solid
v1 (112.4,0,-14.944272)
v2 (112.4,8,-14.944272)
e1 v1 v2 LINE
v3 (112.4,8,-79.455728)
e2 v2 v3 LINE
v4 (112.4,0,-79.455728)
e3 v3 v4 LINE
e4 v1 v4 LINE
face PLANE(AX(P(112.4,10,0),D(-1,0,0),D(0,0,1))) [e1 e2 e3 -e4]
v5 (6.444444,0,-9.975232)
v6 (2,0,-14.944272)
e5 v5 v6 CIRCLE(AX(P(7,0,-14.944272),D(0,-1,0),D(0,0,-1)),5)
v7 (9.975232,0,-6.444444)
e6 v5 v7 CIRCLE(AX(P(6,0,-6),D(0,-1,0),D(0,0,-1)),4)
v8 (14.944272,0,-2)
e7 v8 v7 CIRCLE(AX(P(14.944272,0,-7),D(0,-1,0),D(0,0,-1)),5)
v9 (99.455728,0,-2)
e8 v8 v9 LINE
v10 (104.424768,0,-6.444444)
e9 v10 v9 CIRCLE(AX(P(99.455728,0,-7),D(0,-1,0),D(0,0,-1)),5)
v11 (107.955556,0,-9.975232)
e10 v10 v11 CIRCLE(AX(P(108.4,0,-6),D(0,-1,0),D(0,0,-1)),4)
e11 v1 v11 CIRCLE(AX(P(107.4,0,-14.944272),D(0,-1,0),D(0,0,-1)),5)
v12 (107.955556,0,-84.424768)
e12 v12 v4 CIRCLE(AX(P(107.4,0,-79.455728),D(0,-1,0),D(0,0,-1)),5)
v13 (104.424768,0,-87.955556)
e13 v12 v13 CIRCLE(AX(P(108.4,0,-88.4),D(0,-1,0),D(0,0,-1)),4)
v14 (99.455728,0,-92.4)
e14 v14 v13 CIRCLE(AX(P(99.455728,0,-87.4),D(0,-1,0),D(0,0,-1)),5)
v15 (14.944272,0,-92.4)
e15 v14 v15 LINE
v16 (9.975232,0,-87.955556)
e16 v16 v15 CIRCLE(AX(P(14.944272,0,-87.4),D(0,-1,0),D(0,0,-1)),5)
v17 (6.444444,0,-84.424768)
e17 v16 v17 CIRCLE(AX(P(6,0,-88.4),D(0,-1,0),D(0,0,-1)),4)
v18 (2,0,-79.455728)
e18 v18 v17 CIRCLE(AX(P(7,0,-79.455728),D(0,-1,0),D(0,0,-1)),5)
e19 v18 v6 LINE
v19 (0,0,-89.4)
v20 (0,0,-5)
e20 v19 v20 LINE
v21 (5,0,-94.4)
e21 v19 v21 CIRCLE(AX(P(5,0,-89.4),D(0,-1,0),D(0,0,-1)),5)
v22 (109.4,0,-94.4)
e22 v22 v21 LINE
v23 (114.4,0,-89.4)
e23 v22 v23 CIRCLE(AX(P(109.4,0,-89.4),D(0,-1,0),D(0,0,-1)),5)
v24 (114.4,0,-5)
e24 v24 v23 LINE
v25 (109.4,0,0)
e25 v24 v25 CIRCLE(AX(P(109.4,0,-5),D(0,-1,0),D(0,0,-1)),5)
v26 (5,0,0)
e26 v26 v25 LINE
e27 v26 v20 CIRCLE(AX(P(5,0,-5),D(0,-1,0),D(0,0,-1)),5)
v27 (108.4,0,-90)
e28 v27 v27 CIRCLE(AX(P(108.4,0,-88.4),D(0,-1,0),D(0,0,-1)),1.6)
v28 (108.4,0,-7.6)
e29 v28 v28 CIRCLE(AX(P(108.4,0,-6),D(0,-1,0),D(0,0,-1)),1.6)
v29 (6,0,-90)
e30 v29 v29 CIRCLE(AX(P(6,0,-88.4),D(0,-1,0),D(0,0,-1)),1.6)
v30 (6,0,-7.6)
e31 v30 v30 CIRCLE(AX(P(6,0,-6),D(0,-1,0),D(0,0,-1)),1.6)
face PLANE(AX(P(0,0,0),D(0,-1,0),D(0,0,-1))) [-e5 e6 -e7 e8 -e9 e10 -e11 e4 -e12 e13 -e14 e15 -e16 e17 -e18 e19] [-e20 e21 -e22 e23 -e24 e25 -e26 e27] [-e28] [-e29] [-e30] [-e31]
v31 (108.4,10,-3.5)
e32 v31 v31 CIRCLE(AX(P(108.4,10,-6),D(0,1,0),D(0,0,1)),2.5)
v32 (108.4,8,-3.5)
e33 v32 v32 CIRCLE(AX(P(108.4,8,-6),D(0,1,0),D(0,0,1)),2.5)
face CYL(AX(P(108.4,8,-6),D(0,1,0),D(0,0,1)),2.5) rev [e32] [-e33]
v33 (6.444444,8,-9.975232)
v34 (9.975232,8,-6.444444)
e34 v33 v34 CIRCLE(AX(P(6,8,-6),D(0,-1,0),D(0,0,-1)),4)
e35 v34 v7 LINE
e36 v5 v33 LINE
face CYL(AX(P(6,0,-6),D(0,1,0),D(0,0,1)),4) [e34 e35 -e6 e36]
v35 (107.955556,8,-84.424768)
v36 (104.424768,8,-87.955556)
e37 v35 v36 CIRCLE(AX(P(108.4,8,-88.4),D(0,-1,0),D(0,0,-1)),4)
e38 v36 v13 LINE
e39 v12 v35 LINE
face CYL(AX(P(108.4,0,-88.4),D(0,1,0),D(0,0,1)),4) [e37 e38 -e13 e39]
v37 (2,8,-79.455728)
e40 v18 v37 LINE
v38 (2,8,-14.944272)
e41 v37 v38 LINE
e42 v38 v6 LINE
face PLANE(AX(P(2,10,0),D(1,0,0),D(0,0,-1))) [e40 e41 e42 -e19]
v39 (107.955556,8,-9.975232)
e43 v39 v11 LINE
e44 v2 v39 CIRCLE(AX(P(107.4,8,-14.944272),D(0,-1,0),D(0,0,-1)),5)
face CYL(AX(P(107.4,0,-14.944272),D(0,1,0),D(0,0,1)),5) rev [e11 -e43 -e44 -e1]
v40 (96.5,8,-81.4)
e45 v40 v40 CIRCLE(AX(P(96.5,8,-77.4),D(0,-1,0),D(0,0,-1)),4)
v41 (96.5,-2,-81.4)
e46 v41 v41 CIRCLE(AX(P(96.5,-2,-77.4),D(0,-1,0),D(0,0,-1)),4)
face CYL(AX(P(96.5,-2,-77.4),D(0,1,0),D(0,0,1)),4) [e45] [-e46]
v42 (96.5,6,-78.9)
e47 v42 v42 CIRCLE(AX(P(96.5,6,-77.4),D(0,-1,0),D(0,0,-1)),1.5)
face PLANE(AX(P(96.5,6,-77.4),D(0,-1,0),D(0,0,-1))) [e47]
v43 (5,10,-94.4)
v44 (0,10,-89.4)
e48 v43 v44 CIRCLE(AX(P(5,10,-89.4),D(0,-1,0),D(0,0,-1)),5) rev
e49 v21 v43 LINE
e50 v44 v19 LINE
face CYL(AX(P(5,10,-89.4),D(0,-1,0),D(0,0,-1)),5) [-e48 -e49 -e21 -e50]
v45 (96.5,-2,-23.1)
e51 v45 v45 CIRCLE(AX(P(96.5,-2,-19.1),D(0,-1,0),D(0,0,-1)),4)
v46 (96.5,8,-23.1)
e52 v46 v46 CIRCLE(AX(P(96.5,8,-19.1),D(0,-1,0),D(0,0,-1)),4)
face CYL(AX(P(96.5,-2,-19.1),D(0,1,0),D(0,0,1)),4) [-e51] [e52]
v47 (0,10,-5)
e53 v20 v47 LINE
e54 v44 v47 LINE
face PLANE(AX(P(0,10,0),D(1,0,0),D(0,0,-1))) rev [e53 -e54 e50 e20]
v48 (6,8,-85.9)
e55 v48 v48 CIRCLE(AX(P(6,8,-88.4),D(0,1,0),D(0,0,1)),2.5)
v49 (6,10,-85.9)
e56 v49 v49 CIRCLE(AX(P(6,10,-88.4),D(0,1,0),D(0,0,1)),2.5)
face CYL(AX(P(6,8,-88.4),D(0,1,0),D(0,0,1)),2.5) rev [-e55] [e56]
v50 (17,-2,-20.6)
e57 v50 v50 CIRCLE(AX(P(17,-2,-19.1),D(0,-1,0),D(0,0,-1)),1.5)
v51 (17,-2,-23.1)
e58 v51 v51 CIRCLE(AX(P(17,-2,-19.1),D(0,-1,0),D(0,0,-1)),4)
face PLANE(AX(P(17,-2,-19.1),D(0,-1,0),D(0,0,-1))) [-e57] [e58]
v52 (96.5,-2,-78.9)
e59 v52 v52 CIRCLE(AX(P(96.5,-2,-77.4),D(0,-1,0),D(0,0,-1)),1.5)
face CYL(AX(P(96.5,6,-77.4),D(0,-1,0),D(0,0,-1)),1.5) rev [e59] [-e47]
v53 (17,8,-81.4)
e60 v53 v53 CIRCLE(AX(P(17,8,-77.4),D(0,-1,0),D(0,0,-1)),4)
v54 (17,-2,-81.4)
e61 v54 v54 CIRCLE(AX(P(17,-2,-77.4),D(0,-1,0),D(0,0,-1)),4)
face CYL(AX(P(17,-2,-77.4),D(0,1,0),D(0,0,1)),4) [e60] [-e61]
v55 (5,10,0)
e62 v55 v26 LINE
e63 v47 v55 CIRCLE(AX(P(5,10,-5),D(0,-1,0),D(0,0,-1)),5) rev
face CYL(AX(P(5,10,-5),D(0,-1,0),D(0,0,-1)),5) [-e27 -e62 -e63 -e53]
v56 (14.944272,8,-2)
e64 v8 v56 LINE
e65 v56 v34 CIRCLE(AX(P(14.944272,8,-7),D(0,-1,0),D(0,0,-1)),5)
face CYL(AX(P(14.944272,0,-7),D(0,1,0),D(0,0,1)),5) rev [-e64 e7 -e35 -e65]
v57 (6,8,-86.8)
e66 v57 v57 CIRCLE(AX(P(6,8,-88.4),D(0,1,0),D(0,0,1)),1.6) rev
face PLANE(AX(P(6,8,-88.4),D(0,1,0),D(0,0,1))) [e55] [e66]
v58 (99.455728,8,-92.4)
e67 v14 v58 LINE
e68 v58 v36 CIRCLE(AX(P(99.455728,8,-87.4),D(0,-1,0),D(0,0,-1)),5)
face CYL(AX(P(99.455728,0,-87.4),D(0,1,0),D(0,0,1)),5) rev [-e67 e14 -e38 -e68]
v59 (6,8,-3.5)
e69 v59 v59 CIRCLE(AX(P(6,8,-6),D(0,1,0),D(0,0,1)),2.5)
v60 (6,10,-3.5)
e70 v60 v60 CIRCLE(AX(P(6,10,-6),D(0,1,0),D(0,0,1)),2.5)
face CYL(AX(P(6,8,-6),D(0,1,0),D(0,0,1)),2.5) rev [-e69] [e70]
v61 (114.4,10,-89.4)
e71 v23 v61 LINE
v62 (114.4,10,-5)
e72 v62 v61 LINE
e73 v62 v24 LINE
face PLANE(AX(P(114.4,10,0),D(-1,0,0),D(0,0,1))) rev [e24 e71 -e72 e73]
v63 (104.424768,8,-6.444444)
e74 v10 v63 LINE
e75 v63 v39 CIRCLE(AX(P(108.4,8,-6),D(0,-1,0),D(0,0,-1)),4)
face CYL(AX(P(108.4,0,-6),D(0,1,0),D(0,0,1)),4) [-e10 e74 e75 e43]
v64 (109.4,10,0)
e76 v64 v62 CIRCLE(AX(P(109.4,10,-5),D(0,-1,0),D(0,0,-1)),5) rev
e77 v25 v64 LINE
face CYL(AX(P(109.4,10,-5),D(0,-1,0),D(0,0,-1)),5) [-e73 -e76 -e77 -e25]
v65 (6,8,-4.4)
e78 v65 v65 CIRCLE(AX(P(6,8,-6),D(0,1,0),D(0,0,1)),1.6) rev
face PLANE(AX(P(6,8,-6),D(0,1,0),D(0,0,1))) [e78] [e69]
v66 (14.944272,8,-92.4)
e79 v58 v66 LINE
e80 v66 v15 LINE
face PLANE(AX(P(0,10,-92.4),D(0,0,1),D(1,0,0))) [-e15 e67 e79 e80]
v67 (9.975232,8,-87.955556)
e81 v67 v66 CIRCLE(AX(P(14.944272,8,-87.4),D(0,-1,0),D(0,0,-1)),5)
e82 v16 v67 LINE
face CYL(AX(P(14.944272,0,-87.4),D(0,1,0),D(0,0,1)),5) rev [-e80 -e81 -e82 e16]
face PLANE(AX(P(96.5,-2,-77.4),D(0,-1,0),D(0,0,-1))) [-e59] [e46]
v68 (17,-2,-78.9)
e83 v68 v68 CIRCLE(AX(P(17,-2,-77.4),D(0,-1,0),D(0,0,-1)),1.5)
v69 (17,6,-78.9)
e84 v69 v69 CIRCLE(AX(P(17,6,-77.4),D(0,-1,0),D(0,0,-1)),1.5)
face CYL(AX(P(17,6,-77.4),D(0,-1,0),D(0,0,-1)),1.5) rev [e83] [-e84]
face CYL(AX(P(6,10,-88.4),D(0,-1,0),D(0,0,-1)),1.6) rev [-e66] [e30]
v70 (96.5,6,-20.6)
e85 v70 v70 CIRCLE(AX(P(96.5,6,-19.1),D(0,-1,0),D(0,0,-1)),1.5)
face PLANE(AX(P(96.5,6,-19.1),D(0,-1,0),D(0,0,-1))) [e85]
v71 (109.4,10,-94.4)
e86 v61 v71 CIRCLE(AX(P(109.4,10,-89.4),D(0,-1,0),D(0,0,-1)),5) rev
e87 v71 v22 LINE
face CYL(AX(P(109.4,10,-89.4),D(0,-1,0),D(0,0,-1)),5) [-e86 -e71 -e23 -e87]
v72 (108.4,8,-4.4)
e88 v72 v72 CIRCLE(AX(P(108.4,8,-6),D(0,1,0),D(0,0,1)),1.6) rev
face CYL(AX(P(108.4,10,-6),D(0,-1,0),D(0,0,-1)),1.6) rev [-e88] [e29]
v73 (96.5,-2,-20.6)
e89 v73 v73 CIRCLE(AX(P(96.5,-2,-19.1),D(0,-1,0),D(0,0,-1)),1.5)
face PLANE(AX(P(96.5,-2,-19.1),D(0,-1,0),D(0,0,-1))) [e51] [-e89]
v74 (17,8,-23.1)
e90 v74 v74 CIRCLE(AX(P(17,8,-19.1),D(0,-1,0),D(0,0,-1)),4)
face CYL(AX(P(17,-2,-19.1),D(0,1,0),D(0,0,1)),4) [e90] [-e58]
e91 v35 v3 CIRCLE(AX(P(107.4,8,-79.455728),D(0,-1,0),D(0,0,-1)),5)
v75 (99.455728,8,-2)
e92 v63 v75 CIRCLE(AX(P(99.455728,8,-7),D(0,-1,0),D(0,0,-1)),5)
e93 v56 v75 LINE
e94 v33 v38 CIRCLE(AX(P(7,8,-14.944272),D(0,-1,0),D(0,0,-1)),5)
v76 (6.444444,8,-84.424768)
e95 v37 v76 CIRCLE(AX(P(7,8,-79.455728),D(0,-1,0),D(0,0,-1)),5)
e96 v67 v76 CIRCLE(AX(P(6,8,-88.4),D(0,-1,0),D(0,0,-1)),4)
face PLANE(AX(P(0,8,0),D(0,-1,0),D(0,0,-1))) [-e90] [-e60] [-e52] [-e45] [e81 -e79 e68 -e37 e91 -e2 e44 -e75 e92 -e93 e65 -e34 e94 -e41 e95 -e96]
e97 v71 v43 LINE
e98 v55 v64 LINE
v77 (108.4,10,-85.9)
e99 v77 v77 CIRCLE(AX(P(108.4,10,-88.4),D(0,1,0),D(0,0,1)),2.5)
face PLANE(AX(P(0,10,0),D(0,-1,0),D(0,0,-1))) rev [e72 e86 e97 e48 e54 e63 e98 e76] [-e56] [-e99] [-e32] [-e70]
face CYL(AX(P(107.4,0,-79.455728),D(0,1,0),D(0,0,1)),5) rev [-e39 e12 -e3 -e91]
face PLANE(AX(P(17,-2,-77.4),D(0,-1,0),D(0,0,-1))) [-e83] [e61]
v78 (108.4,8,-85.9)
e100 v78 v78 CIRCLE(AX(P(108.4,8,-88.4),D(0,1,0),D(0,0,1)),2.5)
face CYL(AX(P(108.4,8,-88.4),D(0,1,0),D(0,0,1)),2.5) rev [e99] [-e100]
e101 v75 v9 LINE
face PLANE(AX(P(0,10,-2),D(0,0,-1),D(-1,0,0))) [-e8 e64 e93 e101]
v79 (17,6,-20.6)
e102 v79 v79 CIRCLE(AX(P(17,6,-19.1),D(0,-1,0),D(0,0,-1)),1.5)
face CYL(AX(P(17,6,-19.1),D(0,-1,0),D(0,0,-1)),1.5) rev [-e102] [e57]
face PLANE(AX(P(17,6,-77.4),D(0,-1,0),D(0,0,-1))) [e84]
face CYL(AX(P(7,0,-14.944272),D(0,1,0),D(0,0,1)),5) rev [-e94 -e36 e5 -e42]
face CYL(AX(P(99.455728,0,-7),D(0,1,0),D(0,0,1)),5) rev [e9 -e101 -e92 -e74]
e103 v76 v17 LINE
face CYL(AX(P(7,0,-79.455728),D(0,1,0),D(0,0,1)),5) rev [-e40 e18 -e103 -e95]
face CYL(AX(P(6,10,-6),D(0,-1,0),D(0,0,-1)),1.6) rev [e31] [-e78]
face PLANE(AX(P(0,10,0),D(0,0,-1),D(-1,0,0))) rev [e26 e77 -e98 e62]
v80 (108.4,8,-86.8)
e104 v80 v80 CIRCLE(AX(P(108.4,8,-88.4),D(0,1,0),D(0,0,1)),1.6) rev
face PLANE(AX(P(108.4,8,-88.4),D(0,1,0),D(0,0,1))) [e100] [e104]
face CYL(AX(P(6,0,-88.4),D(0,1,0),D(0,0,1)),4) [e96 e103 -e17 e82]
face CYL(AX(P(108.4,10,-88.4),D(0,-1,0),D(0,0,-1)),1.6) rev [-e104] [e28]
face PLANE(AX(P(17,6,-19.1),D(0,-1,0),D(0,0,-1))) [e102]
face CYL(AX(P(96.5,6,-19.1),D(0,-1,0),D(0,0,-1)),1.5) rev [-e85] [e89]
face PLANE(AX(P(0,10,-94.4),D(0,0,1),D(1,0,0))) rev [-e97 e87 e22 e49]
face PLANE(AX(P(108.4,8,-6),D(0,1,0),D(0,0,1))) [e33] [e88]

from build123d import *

# Parameters (mm, degrees)
SKETCH1_W            = 114.4
SKETCH1_H            = 94.4
BOSS_EXTRUDE1_DEPTH  = 10
SHELL2_T             = -2
FILLET3_R            = 5
FILLET4_R            = 5
SKETCH5_R            = 4
BOSS_EXTRUDE12_DEPTH = 8
FILLET5_R            = 5
FILLET6_R            = 5
FILLET7_R            = 5
FILLET8_R            = 5
FILLET9_R            = 5
FILLET10_R           = 5
FILLET11_DEPTH       = 9
FILLET12_DEPTH       = 9
SKETCH6_R            = 1.6
CUT_EXTRUDE1_DEPTH   = 10
SKETCH7_R            = 4
BOSS_EXTRUDE13_DEPTH = 10
SKETCH8_R            = 1.5
CUT_EXTRUDE2_DEPTH   = 8
SKETCH9_R            = 2.5
CUT_EXTRUDE3_DEPTH   = 2


with BuildPart() as part:
    # Sketch1 → Boss-Extrude1 (new body)
    with BuildSketch(Plane(origin=(0, 0, 0), x_dir=(1, 0, 0), z_dir=(0, 1, 0))):
        with Locations((57.2, 47.2)):
            Rectangle(SKETCH1_W, SKETCH1_H)
    extrude(amount=BOSS_EXTRUDE1_DEPTH)

    # Shell2
    shell2_openings = [part.faces().sort_by_distance(p)[0] for p in [
        (57.2, 0, -47.2),
    ]]
    offset(amount=SHELL2_T, openings=shell2_openings, kind=Kind.INTERSECTION)

    # Fillet3
    fillet3_edges = [part.edges().sort_by_distance(p)[0] for p in [
        (0, 5, -94.4),
        (114.4, 5, -94.4),
        (114.4, 5, 0),
        (0, 5, 0),
    ]]
    fillet(fillet3_edges, radius=FILLET3_R)

    # Fillet4
    fillet4_edges = [part.edges().sort_by_distance(p)[0] for p in [
        (2, 4, -92.4),
        (2, 4, -2),
        (112.4, 4, -2),
        (112.4, 4, -92.4),
    ]]
    fillet(fillet4_edges, radius=FILLET4_R)

    # Sketch5 → Boss-Extrude12 (add)
    with BuildSketch(Plane(origin=(0, 8, 0), x_dir=(-1, 0, 0), z_dir=(0, -1, 0))):
        with Locations((-108.4, 6)):
            Circle(SKETCH5_R)
        with Locations((-108.4, 88.4)):
            Circle(SKETCH5_R)
        with Locations((-6, 88.4)):
            Circle(SKETCH5_R)
        with Locations((-6, 6)):
            Circle(SKETCH5_R)
    extrude(amount=BOSS_EXTRUDE12_DEPTH)

    # Fillet5
    # the kernel refuses this fillet: 5 mm, written as the material it adds along each edge
    with BuildSketch(Plane(origin=(112.372048604, 0, -6.472048604), x_dir=(-0.783459029597643, 0, -0.6214434398574978), z_dir=(0, 1, 0))) as fillet5_piece_1_section:
        with BuildLine():
            CenterArc((9.160403969, -3.547792862), FILLET5_R, 134.800989095, 83.620629792)
            Line((5.243108821, -6.655010061), (4.851379306, -6.965731781))
            ThreePointArc((4.851379306, -6.965731781), (-0.085536357, -0.74172022), (-0.422348831, -0.26762187))
            Line((-0.422348831, -0.26762187), (0.35232323, 0.354779286))
            ThreePointArc((0.35232323, 0.354779286), (2.818585837, -0.661765711), (5.284848444, 0.354779286))
            Line((5.284848444, 0.354779286), (5.637171673, 0))
        make_face()
    fillet5_piece_1 = extrude(amount=29.180673535, mode=Mode.PRIVATE)
    fillet5_piece_1 = split(fillet5_piece_1, bisect_by=Plane(origin=(112.372048604, 10, -6.472048604), z_dir=(0, -1, 0)), keep=Keep.TOP, mode=Mode.PRIVATE)
    add(fillet5_piece_1)

    # Fillet6
    # the kernel refuses this fillet: 5 mm, written as the material it adds along each edge
    with BuildSketch(Plane(origin=(107.927951396, 0, -2.027951396), x_dir=(-0.6214434398574917, 0, -0.7834590295976479), z_dir=(0, 1, 0))) as fillet6_piece_1_section:
        with BuildLine():
            CenterArc((9.160403969, 3.547792862), FILLET6_R, 141.578381114, 83.620629792)
            Line((5.243108821, 6.655010061), (4.851379306, 6.965731781))
            ThreePointArc((4.851379306, 6.965731781), (-0.085536357, 0.74172022), (-0.422348831, 0.26762187))
            Line((-0.422348831, 0.26762187), (0.35232323, -0.354779286))
            ThreePointArc((0.35232323, -0.354779286), (2.818585837, 0.661765711), (5.284848444, -0.354779286))
            Line((5.284848444, -0.354779286), (5.637171673, 0))
        make_face()
    fillet6_piece_1 = extrude(amount=29.180673535, mode=Mode.PRIVATE)
    fillet6_piece_1 = split(fillet6_piece_1, bisect_by=Plane(origin=(107.927951396, 10, -2.027951396), z_dir=(0, -1, 0)), keep=Keep.TOP, mode=Mode.PRIVATE)
    add(fillet6_piece_1)

    # Fillet7
    # the kernel refuses this fillet: 5 mm, written as the material it adds along each edge
    with BuildSketch(Plane(origin=(112.372048604, 0, -87.927951396), x_dir=(-0.783459029597643, 0, 0.6214434398574978), z_dir=(0, 1, 0))) as fillet7_piece_1_section:
        with BuildLine():
            CenterArc((9.160403969, 3.547792862), FILLET7_R, 141.578381114, 83.620629792)
            Line((5.243108821, 6.655010061), (4.851379306, 6.965731781))
            ThreePointArc((4.851379306, 6.965731781), (-0.085536357, 0.74172022), (-0.422348831, 0.26762187))
            Line((-0.422348831, 0.26762187), (0.35232323, -0.354779286))
            ThreePointArc((0.35232323, -0.354779286), (2.818585837, 0.661765711), (5.284848444, -0.354779286))
            Line((5.284848444, -0.354779286), (5.637171673, 0))
        make_face()
    fillet7_piece_1 = extrude(amount=29.180673535, mode=Mode.PRIVATE)
    fillet7_piece_1 = split(fillet7_piece_1, bisect_by=Plane(origin=(112.372048604, 10, -87.927951396), z_dir=(0, -1, 0)), keep=Keep.TOP, mode=Mode.PRIVATE)
    add(fillet7_piece_1)

    # Fillet8
    # the kernel refuses this fillet: 5 mm, written as the material it adds along each edge
    with BuildSketch(Plane(origin=(107.927951396, 0, -92.372048604), x_dir=(-0.6214434398574917, 0, 0.7834590295976479), z_dir=(0, 1, 0))) as fillet8_piece_1_section:
        with BuildLine():
            CenterArc((9.160403969, -3.547792862), FILLET8_R, 134.800989095, 83.620629792)
            Line((5.243108821, -6.655010061), (4.851379306, -6.965731781))
            ThreePointArc((4.851379306, -6.965731781), (-0.085536357, -0.74172022), (-0.422348831, -0.26762187))
            Line((-0.422348831, -0.26762187), (0.35232323, 0.354779286))
            ThreePointArc((0.35232323, 0.354779286), (2.818585837, -0.661765711), (5.284848444, 0.354779286))
            Line((5.284848444, 0.354779286), (5.637171673, 0))
        make_face()
    fillet8_piece_1 = extrude(amount=29.180673535, mode=Mode.PRIVATE)
    fillet8_piece_1 = split(fillet8_piece_1, bisect_by=Plane(origin=(107.927951396, 10, -92.372048604), z_dir=(0, -1, 0)), keep=Keep.TOP, mode=Mode.PRIVATE)
    add(fillet8_piece_1)

    # Fillet9
    # the kernel refuses this fillet: 5 mm, written as the material it adds along each edge
    with BuildSketch(Plane(origin=(6.472048604, 29.180673535, -2.027951396), x_dir=(0.9999945577477605, 0, 0.003299162751511756), z_dir=(0, -1, 0))) as fillet9_piece_1_section:
        with BuildLine():
            CenterArc((8.4557736, -4.999972789), FILLET9_R, 89.810971555, 83.620629792)
            Line((3.488593561, -4.428026585), (2.991875557, -4.370831965))
            ThreePointArc((2.991875557, -4.370831965), (2.264117061, -1.804476076), (-0.060643809, -0.496308703))
            Line((-0.060643809, -0.496308703), (-0.051154492, 0.497376334))
            ThreePointArc((-0.051154492, 0.497376334), (0.52969032, 0.526206725), (8.473918995, 0.499997279))
            Line((8.473918995, 0.499997279), (8.472269414, 0))
        make_face()
    fillet9_piece_1 = extrude(amount=29.180673535, mode=Mode.PRIVATE)
    fillet9_piece_1 = split(fillet9_piece_1, bisect_by=Plane(origin=(6.472048604, 10, -2.027951396), z_dir=(0, -1, 0)), keep=Keep.TOP, mode=Mode.PRIVATE)
    add(fillet9_piece_1)

    # Fillet10
    # the kernel refuses this fillet: 5 mm, written as the material it adds along each edge
    with BuildSketch(Plane(origin=(2.027951396, 29.180673535, -6.472048604), x_dir=(0.783459029597646, 0, -0.6214434398574942), z_dir=(0, -1, 0))) as fillet10_piece_1_section:
        with BuildLine():
            CenterArc((9.160403969, -3.547792862), FILLET10_R, 134.800989095, 83.620629792)
            Line((5.243108821, -6.655010061), (4.851379306, -6.965731781))
            ThreePointArc((4.851379306, -6.965731781), (-0.085536357, -0.74172022), (-0.422348831, -0.26762187))
            Line((-0.422348831, -0.26762187), (0.35232323, 0.354779286))
            ThreePointArc((0.35232323, 0.354779286), (2.818585837, -0.661765711), (5.284848444, 0.354779286))
            Line((5.284848444, 0.354779286), (5.637171673, 0))
        make_face()
    fillet10_piece_1 = extrude(amount=29.180673535, mode=Mode.PRIVATE)
    fillet10_piece_1 = split(fillet10_piece_1, bisect_by=Plane(origin=(2.027951396, 10, -6.472048604), z_dir=(0, -1, 0)), keep=Keep.TOP, mode=Mode.PRIVATE)
    add(fillet10_piece_1)

    # Fillet11: read off the stored shape, not the designer's step
    # Fillet11 outline → Fillet11 (add)
    with BuildSketch(Plane(origin=(0, 0, 0), x_dir=(1, 0, 0), z_dir=(0, 1, 0))):
        with BuildLine():
            ThreePointArc((2, 79.45572809), (3.273220038, 82.789061423), (6.444444444, 84.42476804))
            ThreePointArc((6.444444444, 84.42476804), (3.51422624, 85.266163882), (2.027951396, 87.927951396))
            ThreePointArc((2.027951396, 87.927951396), (2.006992739, 87.664345398), (2, 87.4))
            Line((2, 87.4), (2, 79.45572809))
        make_face()
    extrude(amount=FILLET11_DEPTH)

    # Fillet12: read off the stored shape, not the designer's step
    # Fillet12 outline → Fillet12 (add)
    with BuildSketch(Plane(origin=(0, 0, 0), x_dir=(1, 0, 0), z_dir=(0, 1, 0))):
        with BuildLine():
            ThreePointArc((9.97523196, 87.955555556), (11.610938577, 91.126779962), (14.94427191, 92.4))
            Line((14.94427191, 92.4), (7, 92.4))
            ThreePointArc((7, 92.4), (6.735654602, 92.393007261), (6.472048604, 92.372048604))
            ThreePointArc((6.472048604, 92.372048604), (9.133836118, 90.88577376), (9.97523196, 87.955555556))
        make_face()
    extrude(amount=FILLET12_DEPTH)

    # Sketch6 → Cut-Extrude1 (cut)
    with BuildSketch(Plane(origin=(0, 0, 0), x_dir=(-1, 0, 0), z_dir=(0, -1, 0))):
        with Locations(Location((-6, 6, 0), (0, 0, 90))):
            Circle(SKETCH6_R)
        with Locations(Location((-108.4, 88.4, 0), (0, 0, 90))):
            Circle(SKETCH6_R)
        with Locations(Location((-108.4, 6, 0), (0, 0, 90))):
            Circle(SKETCH6_R)
        with Locations(Location((-6, 88.4, 0), (0, 0, 90))):
            Circle(SKETCH6_R)
    extrude(amount=-CUT_EXTRUDE1_DEPTH, mode=Mode.SUBTRACT)

    # Sketch7 → Boss-Extrude13 (add)
    with BuildSketch(Plane(origin=(0, 8, 0), x_dir=(-1, 0, 0), z_dir=(0, -1, 0))):
        with Locations(Location((-96.5, 19.1, 0), (0, 0, 90))):
            Circle(SKETCH7_R)
        with Locations(Location((-17, 19.1, 0), (0, 0, 90))):
            Circle(SKETCH7_R)
        with Locations(Location((-96.5, 77.4, 0), (0, 0, 90))):
            Circle(SKETCH7_R)
        with Locations(Location((-17, 77.4, 0), (0, 0, 90))):
            Circle(SKETCH7_R)
    extrude(amount=BOSS_EXTRUDE13_DEPTH)

    # Sketch8 → Cut-Extrude2 (cut)
    with BuildSketch(Plane(origin=(0, -2, 0), x_dir=(-1, 0, 0), z_dir=(0, -1, 0))):
        with Locations(Location((-17, 19.1, 0), (0, 0, 90))):
            Circle(SKETCH8_R)
        with Locations(Location((-96.5, 19.1, 0), (0, 0, 90))):
            Circle(SKETCH8_R)
        with Locations(Location((-96.5, 77.4, 0), (0, 0, 90))):
            Circle(SKETCH8_R)
        with Locations(Location((-17, 77.4, 0), (0, 0, 90))):
            Circle(SKETCH8_R)
    extrude(amount=-CUT_EXTRUDE2_DEPTH, mode=Mode.SUBTRACT)

    # Sketch9 → Cut-Extrude3 (cut)
    with BuildSketch(Plane(origin=(0, 10, 0), x_dir=(1, 0, 0), z_dir=(0, 1, 0))):
        with Locations(Location((6, 88.4, 0), (0, 0, 270))):
            Circle(SKETCH9_R)
        with Locations(Location((6, 6, 0), (0, 0, 270))):
            Circle(SKETCH9_R)
        with Locations(Location((108.4, 6, 0), (0, 0, 270))):
            Circle(SKETCH9_R)
        with Locations(Location((108.4, 88.4, 0), (0, 0, 270))):
            Circle(SKETCH9_R)
    extrude(amount=-CUT_EXTRUDE3_DEPTH, mode=Mode.SUBTRACT)


solid = part.part
